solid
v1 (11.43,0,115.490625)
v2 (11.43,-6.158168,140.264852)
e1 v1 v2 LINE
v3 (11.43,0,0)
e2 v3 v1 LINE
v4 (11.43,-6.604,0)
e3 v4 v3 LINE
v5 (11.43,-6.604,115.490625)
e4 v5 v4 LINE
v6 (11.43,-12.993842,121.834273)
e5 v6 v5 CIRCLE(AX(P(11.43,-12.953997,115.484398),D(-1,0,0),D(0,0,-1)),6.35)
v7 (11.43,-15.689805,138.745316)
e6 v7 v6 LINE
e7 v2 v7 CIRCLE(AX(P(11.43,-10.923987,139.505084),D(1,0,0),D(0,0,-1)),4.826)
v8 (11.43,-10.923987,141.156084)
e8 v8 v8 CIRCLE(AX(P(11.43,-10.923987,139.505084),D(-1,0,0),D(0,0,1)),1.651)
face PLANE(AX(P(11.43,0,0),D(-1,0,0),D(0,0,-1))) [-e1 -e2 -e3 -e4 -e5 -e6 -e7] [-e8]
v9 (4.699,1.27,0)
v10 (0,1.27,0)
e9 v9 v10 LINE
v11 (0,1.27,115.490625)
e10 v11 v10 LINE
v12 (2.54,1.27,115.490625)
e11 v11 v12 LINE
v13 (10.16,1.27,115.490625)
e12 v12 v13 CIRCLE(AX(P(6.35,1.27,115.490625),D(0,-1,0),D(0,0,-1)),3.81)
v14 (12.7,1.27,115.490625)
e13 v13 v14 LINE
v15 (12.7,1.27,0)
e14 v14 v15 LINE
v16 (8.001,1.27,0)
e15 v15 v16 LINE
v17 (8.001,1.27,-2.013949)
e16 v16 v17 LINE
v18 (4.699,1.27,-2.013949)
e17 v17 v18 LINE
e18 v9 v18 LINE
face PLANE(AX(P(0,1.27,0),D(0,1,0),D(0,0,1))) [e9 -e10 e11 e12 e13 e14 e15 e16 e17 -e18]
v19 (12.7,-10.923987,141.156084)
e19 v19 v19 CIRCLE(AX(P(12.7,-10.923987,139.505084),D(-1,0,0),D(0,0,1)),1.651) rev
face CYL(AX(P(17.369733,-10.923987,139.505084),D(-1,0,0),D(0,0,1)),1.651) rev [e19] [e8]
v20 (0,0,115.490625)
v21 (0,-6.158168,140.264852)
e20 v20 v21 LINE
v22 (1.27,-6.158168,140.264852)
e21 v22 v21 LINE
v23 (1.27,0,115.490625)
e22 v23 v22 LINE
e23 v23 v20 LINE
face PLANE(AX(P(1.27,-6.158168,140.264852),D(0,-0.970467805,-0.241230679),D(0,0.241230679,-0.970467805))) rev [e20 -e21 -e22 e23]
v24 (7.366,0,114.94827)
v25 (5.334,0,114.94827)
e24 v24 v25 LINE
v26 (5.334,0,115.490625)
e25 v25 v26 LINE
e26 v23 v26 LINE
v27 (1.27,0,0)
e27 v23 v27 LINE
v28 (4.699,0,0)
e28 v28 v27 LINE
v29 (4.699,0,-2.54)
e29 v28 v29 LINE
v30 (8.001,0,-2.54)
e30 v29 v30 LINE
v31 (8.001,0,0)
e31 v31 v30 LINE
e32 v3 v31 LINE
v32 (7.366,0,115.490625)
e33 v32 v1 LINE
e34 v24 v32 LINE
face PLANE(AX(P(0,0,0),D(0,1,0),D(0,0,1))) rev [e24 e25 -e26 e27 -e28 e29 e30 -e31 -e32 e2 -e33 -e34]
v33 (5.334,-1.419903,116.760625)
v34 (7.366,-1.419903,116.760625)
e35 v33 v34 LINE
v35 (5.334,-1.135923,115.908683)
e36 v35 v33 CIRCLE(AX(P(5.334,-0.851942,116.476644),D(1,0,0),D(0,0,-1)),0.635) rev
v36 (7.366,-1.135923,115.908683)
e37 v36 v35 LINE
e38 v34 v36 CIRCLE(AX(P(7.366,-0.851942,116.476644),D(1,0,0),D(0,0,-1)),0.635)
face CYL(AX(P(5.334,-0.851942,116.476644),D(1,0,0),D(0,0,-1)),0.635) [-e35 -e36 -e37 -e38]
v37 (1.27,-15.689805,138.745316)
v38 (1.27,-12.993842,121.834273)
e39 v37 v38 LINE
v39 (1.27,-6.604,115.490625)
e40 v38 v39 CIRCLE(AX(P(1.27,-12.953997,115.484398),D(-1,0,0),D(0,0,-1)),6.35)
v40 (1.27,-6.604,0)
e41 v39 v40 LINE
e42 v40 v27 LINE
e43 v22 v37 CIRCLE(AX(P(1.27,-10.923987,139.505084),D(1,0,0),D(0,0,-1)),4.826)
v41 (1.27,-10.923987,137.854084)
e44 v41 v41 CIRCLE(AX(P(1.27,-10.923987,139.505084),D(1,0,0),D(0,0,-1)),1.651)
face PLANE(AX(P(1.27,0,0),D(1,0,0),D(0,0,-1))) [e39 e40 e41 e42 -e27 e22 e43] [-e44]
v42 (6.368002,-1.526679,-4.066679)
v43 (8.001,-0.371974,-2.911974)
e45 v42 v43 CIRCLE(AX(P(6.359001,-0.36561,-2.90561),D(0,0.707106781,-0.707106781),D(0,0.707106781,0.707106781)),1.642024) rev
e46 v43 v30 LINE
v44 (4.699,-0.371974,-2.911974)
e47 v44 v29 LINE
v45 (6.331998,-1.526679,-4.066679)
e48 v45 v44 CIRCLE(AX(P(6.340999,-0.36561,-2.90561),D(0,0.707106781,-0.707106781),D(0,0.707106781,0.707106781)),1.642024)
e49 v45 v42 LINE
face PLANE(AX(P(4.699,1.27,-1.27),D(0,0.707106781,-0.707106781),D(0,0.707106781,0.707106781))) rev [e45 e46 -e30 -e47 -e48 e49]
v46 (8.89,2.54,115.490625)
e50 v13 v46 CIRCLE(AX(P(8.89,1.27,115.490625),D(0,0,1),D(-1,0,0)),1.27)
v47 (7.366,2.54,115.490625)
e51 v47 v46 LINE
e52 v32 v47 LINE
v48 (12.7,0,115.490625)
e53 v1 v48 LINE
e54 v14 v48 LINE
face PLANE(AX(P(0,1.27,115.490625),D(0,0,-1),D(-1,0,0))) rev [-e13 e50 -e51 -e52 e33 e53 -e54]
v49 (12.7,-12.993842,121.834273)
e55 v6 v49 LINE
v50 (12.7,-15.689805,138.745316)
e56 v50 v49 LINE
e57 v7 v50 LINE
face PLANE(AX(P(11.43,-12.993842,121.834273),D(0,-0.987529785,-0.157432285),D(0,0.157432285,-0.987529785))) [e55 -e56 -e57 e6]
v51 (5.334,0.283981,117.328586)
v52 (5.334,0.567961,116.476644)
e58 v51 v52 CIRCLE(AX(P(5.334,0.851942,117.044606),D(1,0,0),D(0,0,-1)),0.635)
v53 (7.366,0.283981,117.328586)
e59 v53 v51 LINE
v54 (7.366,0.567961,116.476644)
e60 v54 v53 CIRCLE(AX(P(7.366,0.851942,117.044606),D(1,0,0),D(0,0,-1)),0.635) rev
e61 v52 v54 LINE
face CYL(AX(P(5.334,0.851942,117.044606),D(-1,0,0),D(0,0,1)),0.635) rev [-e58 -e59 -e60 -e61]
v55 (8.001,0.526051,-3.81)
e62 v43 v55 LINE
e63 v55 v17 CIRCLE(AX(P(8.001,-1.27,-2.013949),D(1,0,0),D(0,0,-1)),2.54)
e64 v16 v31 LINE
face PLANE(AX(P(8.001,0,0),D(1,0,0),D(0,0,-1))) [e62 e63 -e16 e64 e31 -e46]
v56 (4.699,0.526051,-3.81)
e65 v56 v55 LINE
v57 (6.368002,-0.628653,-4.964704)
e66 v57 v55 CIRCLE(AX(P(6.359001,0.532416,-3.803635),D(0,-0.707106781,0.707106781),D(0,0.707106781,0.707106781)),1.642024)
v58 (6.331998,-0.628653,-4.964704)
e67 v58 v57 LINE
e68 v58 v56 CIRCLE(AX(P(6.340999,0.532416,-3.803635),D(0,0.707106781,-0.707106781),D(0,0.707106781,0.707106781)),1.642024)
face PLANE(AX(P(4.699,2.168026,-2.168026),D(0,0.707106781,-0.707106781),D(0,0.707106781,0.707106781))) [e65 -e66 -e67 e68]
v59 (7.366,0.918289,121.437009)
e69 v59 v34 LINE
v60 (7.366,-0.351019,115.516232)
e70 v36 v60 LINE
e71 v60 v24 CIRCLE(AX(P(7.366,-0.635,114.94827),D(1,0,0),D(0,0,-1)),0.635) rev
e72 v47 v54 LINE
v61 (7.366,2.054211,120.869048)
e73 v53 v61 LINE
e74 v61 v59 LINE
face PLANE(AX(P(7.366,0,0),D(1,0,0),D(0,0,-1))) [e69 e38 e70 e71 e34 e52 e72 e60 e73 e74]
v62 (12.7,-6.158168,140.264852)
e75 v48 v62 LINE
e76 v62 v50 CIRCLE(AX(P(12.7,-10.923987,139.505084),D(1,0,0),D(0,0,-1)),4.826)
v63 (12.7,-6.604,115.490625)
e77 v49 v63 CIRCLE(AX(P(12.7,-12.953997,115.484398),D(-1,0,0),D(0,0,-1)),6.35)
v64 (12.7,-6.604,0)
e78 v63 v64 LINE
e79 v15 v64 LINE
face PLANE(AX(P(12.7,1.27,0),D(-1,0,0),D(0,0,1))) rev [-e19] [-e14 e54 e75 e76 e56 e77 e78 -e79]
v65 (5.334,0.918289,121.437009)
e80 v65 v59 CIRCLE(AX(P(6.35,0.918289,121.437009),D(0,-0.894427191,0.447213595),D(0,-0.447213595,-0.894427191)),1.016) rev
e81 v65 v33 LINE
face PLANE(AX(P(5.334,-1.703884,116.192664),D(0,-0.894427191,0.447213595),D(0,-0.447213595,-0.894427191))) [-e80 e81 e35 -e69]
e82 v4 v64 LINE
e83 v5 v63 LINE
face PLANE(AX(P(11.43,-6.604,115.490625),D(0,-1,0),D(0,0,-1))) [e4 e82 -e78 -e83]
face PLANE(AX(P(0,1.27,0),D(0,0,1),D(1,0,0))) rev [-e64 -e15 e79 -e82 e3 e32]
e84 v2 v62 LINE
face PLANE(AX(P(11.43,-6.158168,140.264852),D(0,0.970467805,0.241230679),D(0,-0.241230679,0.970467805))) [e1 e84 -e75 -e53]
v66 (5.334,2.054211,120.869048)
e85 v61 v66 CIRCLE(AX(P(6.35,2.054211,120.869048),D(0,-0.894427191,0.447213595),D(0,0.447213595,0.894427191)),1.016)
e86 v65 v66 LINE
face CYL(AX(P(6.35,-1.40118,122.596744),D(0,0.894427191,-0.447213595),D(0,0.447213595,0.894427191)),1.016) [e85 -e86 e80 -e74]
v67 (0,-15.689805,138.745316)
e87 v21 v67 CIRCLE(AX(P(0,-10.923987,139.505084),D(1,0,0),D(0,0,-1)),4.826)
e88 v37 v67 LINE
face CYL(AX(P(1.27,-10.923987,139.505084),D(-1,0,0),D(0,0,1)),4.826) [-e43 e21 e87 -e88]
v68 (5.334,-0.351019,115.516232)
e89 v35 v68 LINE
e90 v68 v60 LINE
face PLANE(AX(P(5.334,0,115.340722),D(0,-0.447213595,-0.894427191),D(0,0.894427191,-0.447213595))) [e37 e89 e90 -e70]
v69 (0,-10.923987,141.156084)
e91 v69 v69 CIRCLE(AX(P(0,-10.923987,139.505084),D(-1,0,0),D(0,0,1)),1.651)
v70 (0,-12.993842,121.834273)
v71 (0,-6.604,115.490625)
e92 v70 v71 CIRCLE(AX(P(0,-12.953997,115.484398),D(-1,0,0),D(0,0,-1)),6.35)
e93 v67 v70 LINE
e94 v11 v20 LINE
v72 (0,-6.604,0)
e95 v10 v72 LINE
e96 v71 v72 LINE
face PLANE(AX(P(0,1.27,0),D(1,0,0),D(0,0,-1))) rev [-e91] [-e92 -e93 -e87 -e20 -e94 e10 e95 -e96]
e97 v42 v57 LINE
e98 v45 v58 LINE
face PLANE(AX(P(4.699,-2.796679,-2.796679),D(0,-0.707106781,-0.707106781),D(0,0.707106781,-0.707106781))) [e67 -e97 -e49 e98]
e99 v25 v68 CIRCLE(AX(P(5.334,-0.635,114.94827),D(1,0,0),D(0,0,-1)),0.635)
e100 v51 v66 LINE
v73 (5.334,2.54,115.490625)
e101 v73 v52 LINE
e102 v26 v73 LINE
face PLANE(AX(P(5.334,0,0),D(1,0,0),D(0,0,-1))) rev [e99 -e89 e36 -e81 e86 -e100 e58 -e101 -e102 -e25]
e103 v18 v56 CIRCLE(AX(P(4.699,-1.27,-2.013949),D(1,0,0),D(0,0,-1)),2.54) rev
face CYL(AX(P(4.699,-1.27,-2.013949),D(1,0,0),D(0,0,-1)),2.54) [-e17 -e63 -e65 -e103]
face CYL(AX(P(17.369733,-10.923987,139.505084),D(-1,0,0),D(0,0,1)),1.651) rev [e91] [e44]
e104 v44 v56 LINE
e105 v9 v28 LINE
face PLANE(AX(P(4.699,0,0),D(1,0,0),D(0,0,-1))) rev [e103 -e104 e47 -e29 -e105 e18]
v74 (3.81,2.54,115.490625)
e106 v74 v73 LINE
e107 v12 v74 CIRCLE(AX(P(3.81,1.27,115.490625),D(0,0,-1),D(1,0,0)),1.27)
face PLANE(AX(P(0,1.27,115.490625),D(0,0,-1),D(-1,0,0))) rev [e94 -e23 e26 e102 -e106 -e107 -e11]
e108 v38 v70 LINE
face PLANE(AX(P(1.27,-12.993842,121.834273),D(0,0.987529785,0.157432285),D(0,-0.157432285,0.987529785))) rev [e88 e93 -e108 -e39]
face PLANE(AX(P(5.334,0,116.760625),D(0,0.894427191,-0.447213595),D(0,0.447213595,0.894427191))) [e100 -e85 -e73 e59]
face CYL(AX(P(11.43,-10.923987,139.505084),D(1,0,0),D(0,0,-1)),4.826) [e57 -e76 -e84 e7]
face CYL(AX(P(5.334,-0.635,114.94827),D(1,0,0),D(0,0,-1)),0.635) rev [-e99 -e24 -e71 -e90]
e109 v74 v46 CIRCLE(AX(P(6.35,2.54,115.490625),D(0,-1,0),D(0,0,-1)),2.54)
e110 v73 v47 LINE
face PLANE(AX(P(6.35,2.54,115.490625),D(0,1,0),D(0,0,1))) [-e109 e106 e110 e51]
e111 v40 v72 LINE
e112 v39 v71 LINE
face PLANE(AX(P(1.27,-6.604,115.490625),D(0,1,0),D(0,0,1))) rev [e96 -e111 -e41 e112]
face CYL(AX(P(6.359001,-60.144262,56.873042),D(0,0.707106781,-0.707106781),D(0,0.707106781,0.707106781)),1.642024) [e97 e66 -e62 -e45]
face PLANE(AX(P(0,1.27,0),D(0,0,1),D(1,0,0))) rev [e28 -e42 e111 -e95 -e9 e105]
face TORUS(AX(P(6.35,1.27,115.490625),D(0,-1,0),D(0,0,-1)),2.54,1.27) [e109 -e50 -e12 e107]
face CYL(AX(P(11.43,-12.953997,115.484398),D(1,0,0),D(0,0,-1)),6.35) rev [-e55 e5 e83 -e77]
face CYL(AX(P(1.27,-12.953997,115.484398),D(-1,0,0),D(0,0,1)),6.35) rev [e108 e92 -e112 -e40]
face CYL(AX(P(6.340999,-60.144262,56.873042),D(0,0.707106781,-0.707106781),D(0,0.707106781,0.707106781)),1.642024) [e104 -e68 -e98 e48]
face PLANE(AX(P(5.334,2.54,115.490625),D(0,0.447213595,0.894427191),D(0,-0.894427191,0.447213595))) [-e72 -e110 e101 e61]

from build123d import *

# Parameters (mm, degrees)
SKETCH1_W                = 12.7
SKETCH1_H                = 115.490625
BOSS_EXTRUDE1_DEPTH      = 1.27
SKETCH2_W                = 5.08
SKETCH2_H                = 24.638
CUT_EXTRUDE1_DEPTH       = 1.27
SKETCH3_R                = 1.778
CUT_EXTRUDE2_DEPTH       = 1.27
SKETCH4_R                = 1.778
CUT_EXTRUDE3_DEPTH       = 1.27
CUT_EXTRUDE4_DEPTH       = 1.27
REVOLVE1_ANGLE           = 180
BOSS_EXTRUDE2_DEPTH      = 1.651
BOSS_EXTRUDE2_DEPTH_BACK = 1.651
FILLET1_R                = 2.54
CUT_EXTRUDE5_START       = -1.27
CUT_EXTRUDE5_DEPTH       = 1.27
BOSS_EXTRUDE3_DEPTH      = 1.016
BOSS_EXTRUDE3_DEPTH_BACK = 1.016
FILLET2_R                = 0.635
FILLET3_R                = 0.635
FILLET4_R                = 0.635
CUT_EXTRUDE6_DEPTH       = 112.292512614
SKETCH13_W               = 115.490625
SKETCH13_H               = 7.874
BOSS_EXTRUDE4_DEPTH      = 1.27
FILLET6_R                = 0.635
BOSS_EXTRUDE5_DEPTH      = 1.27
CUT_EXTRUDE7_REACH       = 147.742
SKETCH16_R               = 1.651


# Read off the part's stored shape, not the designer's step: Cut-Extrude5
with BuildPart() as part:
    # Sketch1 → Boss-Extrude1 (new body)
    with BuildSketch(Plane(origin=(0, 0, 0), x_dir=(1, 0, 0), z_dir=(0, 1, 0))):
        with Locations((6.35, -57.7453125)):
            Rectangle(SKETCH1_W, SKETCH1_H)
    boss_extrude1 = extrude(amount=BOSS_EXTRUDE1_DEPTH)

    # Sketch2 → Cut-Extrude1 (cut)
    with BuildSketch(Plane(origin=(0, 1.27, 0), x_dir=(1, 0, 0), z_dir=(0, 1, 0))):
        with Locations((6.35, -33.147)):
            Rectangle(SKETCH2_W, SKETCH2_H)
    extrude(amount=-CUT_EXTRUDE1_DEPTH, mode=Mode.SUBTRACT)

    # Sketch3 → Cut-Extrude2 (cut)
    with BuildSketch(Plane(origin=(0, 1.27, 0), x_dir=(1, 0, 0), z_dir=(0, 1, 0))):
        with Locations(Location((6.35, -58.674, 0), (0, 0, 270))):
            Circle(SKETCH3_R)
    extrude(amount=-CUT_EXTRUDE2_DEPTH, mode=Mode.SUBTRACT)

    # Sketch4 → Cut-Extrude3 (cut)
    with BuildSketch(Plane(origin=(0, 1.27, 0), x_dir=(1, 0, 0), z_dir=(0, 1, 0))):
        with Locations(Location((6.35, -113.03, 0), (0, 0, 270))):
            Circle(SKETCH4_R)
    extrude(amount=-CUT_EXTRUDE3_DEPTH, mode=Mode.SUBTRACT)

    # Sketch5 → Cut-Extrude4 (cut)
    with BuildSketch(Plane(origin=(0, 1.27, 0), x_dir=(1, 0, 0), z_dir=(0, 1, 0))):
        Polygon((5.077023467, -4.318), (7.62, -4.318), (8.89, -5.588), (8.89, -13.208), (3.81, -13.208), (3.81, -5.585023467), align=None)
    extrude(amount=-CUT_EXTRUDE4_DEPTH, mode=Mode.SUBTRACT)

    # Sketch6 → Revolve1 (revolve)
    with BuildSketch(Plane.XY.offset(115.490625)):
        with BuildLine():
            Line((6.35, 1.27), (10.16, 1.27))
            ThreePointArc((10.16, 1.27), (9.788025612, 2.168025612), (8.89, 2.54))
            Line((8.89, 2.54), (6.35, 2.54))
            Line((6.35, 2.54), (6.35, 1.27))
        make_face()
    revolve(axis=Axis((6.35, 1.27, 115.490625), (0, 1, 0)), revolution_arc=REVOLVE1_ANGLE)

    # Sketch7 → Boss-Extrude2 (add, two sides: drawn at the far end of the back side and taken through both)
    with BuildSketch(Plane(origin=(6.35, 0, 0), x_dir=(0, 0, -1), z_dir=(1, 0, 0)).offset(-BOSS_EXTRUDE2_DEPTH_BACK)):
        Polygon((0, 1.27), (3.066051224, 1.27), (4.964704214, -0.62865299), (4.066678602, -1.526678602), (2.54, 0), (0, 0), align=None)
    extrude(amount=BOSS_EXTRUDE2_DEPTH + BOSS_EXTRUDE2_DEPTH_BACK)

    # Fillet1
    fillet1_edges = [part.edges().sort_by_distance(p)[0] for p in [
        (6.35, 1.27, -3.066051224),
    ]]
    fillet(fillet1_edges, radius=FILLET1_R)

    # Cut-Extrude5 outline → Cut-Extrude5 (cut)
    with BuildSketch(Plane(origin=(0, 2.168025612, -2.168025612), x_dir=(1, 0, 0), z_dir=(0, 0.7071067811865515, -0.7071067811865437)).offset(CUT_EXTRUDE5_START)):
        with BuildLine():
            ThreePointArc((4.699, 2.322102448), (5.179912981, 3.474187827), (6.33199836, 3.955100809))
            Line((6.33199836, 3.955100809), (4.699, 3.955100809))
            Line((4.699, 3.955100809), (4.699, 2.322102448))
        make_face()
    cut_extrude5 = extrude(amount=CUT_EXTRUDE5_DEPTH, mode=Mode.SUBTRACT)

    # Mirror1: Cut-Extrude5 across plane
    add(cut_extrude5.mirror(Plane(origin=(6.35, 0, 0), x_dir=(0, 0, 1), z_dir=(1, 0, 0))), mode=Mode.SUBTRACT)

    # Sketch11 → Boss-Extrude3 (add, two sides: drawn at the far end of the back side and taken through both)
    with BuildSketch(Plane(origin=(6.35, 0, 0), x_dir=(0, 0, -1), z_dir=(1, 0, 0)).offset(-BOSS_EXTRUDE3_DEPTH_BACK)):
        Polygon((-115.340721834, 0), (-116.192663734, -1.703883799), (-122.345747046, 1.372657857), (-121.77778578, 2.50858039), (-116.760625, 0), (-115.490625, 2.54), (-115.490625, 0), align=None)
    extrude(amount=BOSS_EXTRUDE3_DEPTH + BOSS_EXTRUDE3_DEPTH_BACK)

    # Fillet2
    fillet2_edges = [part.edges().sort_by_distance(p)[0] for p in [
        (6.35, 0, 116.760625),
    ]]
    fillet(fillet2_edges, radius=FILLET2_R)

    # Fillet3
    fillet3_edges = [part.edges().sort_by_distance(p)[0] for p in [
        (6.35, -1.703883799, 116.192663734),
    ]]
    fillet(fillet3_edges, radius=FILLET3_R)

    # Fillet4
    fillet4_edges = [part.edges().sort_by_distance(p)[0] for p in [
        (6.35, 0, 115.340721834),
    ]]
    fillet(fillet4_edges, radius=FILLET4_R)

    # Sketch12 → Cut-Extrude6 (cut, through all)
    with BuildSketch(Plane(origin=(0, -46.70425, 23.352125), x_dir=(1, 0, 0), z_dir=(0, 0.8944271909999153, -0.4472135954999592))):
        with BuildLine():
            Line((6.35, -110.043234117), (7.366, -110.043234117))
            Line((7.366, -110.043234117), (7.366, -109.027234117))
            ThreePointArc((7.366, -109.027234117), (7.06842049, -109.745654607), (6.35, -110.043234117))
        make_face()
    cut_extrude6 = extrude(amount=-CUT_EXTRUDE6_DEPTH, mode=Mode.SUBTRACT)

    # Mirror2: Cut-Extrude6 across plane
    add(cut_extrude6.mirror(Plane(origin=(6.35, 0, 0), x_dir=(0, 0, 1), z_dir=(1, 0, 0))), mode=Mode.SUBTRACT)

    # Sketch13 → Boss-Extrude4 (add)
    with BuildSketch(Plane(origin=(0, 0, 0), x_dir=(0, 0, -1), z_dir=(1, 0, 0))):
        with Locations((-57.7453125, -2.667)):
            Rectangle(SKETCH13_W, SKETCH13_H)
    boss_extrude4 = extrude(amount=BOSS_EXTRUDE4_DEPTH)

    # Fillet6
    fillet6_edges = [part.edges().sort_by_distance(p)[0] for p in [
        (0, 1.27, 57.7453125),
    ]]
    fillet(fillet6_edges, radius=FILLET6_R)

    # Sketch14 → Boss-Extrude5 (add)
    with BuildSketch(Plane(origin=(0, 0, 0), x_dir=(0, 0, -1), z_dir=(1, 0, 0))):
        with BuildLine():
            Line((-121.834273366, -12.993842066), (-138.745315854, -15.689805361))
            ThreePointArc((-138.745315854, -15.689805361), (-144.2709028, -11.683754825), (-140.264852264, -6.158167879))
            Line((-140.264852264, -6.158167879), (-115.490625, 0))
            Line((-115.490625, 0), (-115.490625, -6.604))
            ThreePointArc((-115.490625, -6.604), (-119.99078577, -8.48018731), (-121.834273366, -12.993842066))
        make_face()
    boss_extrude5 = extrude(amount=BOSS_EXTRUDE5_DEPTH)

    # Mirror3: Boss-Extrude1, Boss-Extrude4, Boss-Extrude5 across plane
    add(boss_extrude1.mirror(Plane(origin=(6.35, 0, 0), x_dir=(0, 0, 1), z_dir=(1, 0, 0))))
    add(boss_extrude4.mirror(Plane(origin=(6.35, 0, 0), x_dir=(0, 0, 1), z_dir=(1, 0, 0))))
    add(boss_extrude5.mirror(Plane(origin=(6.35, 0, 0), x_dir=(0, 0, 1), z_dir=(1, 0, 0))))

    # Cut-Extrude7: up to this face of the body (flat: up to its plane)
    cut_extrude7_end = Plane(part.part.faces().sort_by_distance((12.7, -4.009508171, 74.287192312))[0])
    # Sketch16 → Cut-Extrude7 (cut, up to the picked face)
    with BuildSketch(Plane.ZY, mode=Mode.PRIVATE) as cut_extrude7_sk1:
        with Locations((139.505084059, -10.92398662)):
            Circle(SKETCH16_R)
    cut_extrude7_tool1 = split(extrude(cut_extrude7_sk1.sketch, amount=-CUT_EXTRUDE7_REACH, mode=Mode.PRIVATE), bisect_by=cut_extrude7_end, keep=Keep.BOTH, mode=Mode.PRIVATE)
    add(cut_extrude7_tool1.solids().sort_by(Axis((0, -10.923987, 139.505084), (1, 0, 0)))[0], mode=Mode.SUBTRACT)


solid = part.part
